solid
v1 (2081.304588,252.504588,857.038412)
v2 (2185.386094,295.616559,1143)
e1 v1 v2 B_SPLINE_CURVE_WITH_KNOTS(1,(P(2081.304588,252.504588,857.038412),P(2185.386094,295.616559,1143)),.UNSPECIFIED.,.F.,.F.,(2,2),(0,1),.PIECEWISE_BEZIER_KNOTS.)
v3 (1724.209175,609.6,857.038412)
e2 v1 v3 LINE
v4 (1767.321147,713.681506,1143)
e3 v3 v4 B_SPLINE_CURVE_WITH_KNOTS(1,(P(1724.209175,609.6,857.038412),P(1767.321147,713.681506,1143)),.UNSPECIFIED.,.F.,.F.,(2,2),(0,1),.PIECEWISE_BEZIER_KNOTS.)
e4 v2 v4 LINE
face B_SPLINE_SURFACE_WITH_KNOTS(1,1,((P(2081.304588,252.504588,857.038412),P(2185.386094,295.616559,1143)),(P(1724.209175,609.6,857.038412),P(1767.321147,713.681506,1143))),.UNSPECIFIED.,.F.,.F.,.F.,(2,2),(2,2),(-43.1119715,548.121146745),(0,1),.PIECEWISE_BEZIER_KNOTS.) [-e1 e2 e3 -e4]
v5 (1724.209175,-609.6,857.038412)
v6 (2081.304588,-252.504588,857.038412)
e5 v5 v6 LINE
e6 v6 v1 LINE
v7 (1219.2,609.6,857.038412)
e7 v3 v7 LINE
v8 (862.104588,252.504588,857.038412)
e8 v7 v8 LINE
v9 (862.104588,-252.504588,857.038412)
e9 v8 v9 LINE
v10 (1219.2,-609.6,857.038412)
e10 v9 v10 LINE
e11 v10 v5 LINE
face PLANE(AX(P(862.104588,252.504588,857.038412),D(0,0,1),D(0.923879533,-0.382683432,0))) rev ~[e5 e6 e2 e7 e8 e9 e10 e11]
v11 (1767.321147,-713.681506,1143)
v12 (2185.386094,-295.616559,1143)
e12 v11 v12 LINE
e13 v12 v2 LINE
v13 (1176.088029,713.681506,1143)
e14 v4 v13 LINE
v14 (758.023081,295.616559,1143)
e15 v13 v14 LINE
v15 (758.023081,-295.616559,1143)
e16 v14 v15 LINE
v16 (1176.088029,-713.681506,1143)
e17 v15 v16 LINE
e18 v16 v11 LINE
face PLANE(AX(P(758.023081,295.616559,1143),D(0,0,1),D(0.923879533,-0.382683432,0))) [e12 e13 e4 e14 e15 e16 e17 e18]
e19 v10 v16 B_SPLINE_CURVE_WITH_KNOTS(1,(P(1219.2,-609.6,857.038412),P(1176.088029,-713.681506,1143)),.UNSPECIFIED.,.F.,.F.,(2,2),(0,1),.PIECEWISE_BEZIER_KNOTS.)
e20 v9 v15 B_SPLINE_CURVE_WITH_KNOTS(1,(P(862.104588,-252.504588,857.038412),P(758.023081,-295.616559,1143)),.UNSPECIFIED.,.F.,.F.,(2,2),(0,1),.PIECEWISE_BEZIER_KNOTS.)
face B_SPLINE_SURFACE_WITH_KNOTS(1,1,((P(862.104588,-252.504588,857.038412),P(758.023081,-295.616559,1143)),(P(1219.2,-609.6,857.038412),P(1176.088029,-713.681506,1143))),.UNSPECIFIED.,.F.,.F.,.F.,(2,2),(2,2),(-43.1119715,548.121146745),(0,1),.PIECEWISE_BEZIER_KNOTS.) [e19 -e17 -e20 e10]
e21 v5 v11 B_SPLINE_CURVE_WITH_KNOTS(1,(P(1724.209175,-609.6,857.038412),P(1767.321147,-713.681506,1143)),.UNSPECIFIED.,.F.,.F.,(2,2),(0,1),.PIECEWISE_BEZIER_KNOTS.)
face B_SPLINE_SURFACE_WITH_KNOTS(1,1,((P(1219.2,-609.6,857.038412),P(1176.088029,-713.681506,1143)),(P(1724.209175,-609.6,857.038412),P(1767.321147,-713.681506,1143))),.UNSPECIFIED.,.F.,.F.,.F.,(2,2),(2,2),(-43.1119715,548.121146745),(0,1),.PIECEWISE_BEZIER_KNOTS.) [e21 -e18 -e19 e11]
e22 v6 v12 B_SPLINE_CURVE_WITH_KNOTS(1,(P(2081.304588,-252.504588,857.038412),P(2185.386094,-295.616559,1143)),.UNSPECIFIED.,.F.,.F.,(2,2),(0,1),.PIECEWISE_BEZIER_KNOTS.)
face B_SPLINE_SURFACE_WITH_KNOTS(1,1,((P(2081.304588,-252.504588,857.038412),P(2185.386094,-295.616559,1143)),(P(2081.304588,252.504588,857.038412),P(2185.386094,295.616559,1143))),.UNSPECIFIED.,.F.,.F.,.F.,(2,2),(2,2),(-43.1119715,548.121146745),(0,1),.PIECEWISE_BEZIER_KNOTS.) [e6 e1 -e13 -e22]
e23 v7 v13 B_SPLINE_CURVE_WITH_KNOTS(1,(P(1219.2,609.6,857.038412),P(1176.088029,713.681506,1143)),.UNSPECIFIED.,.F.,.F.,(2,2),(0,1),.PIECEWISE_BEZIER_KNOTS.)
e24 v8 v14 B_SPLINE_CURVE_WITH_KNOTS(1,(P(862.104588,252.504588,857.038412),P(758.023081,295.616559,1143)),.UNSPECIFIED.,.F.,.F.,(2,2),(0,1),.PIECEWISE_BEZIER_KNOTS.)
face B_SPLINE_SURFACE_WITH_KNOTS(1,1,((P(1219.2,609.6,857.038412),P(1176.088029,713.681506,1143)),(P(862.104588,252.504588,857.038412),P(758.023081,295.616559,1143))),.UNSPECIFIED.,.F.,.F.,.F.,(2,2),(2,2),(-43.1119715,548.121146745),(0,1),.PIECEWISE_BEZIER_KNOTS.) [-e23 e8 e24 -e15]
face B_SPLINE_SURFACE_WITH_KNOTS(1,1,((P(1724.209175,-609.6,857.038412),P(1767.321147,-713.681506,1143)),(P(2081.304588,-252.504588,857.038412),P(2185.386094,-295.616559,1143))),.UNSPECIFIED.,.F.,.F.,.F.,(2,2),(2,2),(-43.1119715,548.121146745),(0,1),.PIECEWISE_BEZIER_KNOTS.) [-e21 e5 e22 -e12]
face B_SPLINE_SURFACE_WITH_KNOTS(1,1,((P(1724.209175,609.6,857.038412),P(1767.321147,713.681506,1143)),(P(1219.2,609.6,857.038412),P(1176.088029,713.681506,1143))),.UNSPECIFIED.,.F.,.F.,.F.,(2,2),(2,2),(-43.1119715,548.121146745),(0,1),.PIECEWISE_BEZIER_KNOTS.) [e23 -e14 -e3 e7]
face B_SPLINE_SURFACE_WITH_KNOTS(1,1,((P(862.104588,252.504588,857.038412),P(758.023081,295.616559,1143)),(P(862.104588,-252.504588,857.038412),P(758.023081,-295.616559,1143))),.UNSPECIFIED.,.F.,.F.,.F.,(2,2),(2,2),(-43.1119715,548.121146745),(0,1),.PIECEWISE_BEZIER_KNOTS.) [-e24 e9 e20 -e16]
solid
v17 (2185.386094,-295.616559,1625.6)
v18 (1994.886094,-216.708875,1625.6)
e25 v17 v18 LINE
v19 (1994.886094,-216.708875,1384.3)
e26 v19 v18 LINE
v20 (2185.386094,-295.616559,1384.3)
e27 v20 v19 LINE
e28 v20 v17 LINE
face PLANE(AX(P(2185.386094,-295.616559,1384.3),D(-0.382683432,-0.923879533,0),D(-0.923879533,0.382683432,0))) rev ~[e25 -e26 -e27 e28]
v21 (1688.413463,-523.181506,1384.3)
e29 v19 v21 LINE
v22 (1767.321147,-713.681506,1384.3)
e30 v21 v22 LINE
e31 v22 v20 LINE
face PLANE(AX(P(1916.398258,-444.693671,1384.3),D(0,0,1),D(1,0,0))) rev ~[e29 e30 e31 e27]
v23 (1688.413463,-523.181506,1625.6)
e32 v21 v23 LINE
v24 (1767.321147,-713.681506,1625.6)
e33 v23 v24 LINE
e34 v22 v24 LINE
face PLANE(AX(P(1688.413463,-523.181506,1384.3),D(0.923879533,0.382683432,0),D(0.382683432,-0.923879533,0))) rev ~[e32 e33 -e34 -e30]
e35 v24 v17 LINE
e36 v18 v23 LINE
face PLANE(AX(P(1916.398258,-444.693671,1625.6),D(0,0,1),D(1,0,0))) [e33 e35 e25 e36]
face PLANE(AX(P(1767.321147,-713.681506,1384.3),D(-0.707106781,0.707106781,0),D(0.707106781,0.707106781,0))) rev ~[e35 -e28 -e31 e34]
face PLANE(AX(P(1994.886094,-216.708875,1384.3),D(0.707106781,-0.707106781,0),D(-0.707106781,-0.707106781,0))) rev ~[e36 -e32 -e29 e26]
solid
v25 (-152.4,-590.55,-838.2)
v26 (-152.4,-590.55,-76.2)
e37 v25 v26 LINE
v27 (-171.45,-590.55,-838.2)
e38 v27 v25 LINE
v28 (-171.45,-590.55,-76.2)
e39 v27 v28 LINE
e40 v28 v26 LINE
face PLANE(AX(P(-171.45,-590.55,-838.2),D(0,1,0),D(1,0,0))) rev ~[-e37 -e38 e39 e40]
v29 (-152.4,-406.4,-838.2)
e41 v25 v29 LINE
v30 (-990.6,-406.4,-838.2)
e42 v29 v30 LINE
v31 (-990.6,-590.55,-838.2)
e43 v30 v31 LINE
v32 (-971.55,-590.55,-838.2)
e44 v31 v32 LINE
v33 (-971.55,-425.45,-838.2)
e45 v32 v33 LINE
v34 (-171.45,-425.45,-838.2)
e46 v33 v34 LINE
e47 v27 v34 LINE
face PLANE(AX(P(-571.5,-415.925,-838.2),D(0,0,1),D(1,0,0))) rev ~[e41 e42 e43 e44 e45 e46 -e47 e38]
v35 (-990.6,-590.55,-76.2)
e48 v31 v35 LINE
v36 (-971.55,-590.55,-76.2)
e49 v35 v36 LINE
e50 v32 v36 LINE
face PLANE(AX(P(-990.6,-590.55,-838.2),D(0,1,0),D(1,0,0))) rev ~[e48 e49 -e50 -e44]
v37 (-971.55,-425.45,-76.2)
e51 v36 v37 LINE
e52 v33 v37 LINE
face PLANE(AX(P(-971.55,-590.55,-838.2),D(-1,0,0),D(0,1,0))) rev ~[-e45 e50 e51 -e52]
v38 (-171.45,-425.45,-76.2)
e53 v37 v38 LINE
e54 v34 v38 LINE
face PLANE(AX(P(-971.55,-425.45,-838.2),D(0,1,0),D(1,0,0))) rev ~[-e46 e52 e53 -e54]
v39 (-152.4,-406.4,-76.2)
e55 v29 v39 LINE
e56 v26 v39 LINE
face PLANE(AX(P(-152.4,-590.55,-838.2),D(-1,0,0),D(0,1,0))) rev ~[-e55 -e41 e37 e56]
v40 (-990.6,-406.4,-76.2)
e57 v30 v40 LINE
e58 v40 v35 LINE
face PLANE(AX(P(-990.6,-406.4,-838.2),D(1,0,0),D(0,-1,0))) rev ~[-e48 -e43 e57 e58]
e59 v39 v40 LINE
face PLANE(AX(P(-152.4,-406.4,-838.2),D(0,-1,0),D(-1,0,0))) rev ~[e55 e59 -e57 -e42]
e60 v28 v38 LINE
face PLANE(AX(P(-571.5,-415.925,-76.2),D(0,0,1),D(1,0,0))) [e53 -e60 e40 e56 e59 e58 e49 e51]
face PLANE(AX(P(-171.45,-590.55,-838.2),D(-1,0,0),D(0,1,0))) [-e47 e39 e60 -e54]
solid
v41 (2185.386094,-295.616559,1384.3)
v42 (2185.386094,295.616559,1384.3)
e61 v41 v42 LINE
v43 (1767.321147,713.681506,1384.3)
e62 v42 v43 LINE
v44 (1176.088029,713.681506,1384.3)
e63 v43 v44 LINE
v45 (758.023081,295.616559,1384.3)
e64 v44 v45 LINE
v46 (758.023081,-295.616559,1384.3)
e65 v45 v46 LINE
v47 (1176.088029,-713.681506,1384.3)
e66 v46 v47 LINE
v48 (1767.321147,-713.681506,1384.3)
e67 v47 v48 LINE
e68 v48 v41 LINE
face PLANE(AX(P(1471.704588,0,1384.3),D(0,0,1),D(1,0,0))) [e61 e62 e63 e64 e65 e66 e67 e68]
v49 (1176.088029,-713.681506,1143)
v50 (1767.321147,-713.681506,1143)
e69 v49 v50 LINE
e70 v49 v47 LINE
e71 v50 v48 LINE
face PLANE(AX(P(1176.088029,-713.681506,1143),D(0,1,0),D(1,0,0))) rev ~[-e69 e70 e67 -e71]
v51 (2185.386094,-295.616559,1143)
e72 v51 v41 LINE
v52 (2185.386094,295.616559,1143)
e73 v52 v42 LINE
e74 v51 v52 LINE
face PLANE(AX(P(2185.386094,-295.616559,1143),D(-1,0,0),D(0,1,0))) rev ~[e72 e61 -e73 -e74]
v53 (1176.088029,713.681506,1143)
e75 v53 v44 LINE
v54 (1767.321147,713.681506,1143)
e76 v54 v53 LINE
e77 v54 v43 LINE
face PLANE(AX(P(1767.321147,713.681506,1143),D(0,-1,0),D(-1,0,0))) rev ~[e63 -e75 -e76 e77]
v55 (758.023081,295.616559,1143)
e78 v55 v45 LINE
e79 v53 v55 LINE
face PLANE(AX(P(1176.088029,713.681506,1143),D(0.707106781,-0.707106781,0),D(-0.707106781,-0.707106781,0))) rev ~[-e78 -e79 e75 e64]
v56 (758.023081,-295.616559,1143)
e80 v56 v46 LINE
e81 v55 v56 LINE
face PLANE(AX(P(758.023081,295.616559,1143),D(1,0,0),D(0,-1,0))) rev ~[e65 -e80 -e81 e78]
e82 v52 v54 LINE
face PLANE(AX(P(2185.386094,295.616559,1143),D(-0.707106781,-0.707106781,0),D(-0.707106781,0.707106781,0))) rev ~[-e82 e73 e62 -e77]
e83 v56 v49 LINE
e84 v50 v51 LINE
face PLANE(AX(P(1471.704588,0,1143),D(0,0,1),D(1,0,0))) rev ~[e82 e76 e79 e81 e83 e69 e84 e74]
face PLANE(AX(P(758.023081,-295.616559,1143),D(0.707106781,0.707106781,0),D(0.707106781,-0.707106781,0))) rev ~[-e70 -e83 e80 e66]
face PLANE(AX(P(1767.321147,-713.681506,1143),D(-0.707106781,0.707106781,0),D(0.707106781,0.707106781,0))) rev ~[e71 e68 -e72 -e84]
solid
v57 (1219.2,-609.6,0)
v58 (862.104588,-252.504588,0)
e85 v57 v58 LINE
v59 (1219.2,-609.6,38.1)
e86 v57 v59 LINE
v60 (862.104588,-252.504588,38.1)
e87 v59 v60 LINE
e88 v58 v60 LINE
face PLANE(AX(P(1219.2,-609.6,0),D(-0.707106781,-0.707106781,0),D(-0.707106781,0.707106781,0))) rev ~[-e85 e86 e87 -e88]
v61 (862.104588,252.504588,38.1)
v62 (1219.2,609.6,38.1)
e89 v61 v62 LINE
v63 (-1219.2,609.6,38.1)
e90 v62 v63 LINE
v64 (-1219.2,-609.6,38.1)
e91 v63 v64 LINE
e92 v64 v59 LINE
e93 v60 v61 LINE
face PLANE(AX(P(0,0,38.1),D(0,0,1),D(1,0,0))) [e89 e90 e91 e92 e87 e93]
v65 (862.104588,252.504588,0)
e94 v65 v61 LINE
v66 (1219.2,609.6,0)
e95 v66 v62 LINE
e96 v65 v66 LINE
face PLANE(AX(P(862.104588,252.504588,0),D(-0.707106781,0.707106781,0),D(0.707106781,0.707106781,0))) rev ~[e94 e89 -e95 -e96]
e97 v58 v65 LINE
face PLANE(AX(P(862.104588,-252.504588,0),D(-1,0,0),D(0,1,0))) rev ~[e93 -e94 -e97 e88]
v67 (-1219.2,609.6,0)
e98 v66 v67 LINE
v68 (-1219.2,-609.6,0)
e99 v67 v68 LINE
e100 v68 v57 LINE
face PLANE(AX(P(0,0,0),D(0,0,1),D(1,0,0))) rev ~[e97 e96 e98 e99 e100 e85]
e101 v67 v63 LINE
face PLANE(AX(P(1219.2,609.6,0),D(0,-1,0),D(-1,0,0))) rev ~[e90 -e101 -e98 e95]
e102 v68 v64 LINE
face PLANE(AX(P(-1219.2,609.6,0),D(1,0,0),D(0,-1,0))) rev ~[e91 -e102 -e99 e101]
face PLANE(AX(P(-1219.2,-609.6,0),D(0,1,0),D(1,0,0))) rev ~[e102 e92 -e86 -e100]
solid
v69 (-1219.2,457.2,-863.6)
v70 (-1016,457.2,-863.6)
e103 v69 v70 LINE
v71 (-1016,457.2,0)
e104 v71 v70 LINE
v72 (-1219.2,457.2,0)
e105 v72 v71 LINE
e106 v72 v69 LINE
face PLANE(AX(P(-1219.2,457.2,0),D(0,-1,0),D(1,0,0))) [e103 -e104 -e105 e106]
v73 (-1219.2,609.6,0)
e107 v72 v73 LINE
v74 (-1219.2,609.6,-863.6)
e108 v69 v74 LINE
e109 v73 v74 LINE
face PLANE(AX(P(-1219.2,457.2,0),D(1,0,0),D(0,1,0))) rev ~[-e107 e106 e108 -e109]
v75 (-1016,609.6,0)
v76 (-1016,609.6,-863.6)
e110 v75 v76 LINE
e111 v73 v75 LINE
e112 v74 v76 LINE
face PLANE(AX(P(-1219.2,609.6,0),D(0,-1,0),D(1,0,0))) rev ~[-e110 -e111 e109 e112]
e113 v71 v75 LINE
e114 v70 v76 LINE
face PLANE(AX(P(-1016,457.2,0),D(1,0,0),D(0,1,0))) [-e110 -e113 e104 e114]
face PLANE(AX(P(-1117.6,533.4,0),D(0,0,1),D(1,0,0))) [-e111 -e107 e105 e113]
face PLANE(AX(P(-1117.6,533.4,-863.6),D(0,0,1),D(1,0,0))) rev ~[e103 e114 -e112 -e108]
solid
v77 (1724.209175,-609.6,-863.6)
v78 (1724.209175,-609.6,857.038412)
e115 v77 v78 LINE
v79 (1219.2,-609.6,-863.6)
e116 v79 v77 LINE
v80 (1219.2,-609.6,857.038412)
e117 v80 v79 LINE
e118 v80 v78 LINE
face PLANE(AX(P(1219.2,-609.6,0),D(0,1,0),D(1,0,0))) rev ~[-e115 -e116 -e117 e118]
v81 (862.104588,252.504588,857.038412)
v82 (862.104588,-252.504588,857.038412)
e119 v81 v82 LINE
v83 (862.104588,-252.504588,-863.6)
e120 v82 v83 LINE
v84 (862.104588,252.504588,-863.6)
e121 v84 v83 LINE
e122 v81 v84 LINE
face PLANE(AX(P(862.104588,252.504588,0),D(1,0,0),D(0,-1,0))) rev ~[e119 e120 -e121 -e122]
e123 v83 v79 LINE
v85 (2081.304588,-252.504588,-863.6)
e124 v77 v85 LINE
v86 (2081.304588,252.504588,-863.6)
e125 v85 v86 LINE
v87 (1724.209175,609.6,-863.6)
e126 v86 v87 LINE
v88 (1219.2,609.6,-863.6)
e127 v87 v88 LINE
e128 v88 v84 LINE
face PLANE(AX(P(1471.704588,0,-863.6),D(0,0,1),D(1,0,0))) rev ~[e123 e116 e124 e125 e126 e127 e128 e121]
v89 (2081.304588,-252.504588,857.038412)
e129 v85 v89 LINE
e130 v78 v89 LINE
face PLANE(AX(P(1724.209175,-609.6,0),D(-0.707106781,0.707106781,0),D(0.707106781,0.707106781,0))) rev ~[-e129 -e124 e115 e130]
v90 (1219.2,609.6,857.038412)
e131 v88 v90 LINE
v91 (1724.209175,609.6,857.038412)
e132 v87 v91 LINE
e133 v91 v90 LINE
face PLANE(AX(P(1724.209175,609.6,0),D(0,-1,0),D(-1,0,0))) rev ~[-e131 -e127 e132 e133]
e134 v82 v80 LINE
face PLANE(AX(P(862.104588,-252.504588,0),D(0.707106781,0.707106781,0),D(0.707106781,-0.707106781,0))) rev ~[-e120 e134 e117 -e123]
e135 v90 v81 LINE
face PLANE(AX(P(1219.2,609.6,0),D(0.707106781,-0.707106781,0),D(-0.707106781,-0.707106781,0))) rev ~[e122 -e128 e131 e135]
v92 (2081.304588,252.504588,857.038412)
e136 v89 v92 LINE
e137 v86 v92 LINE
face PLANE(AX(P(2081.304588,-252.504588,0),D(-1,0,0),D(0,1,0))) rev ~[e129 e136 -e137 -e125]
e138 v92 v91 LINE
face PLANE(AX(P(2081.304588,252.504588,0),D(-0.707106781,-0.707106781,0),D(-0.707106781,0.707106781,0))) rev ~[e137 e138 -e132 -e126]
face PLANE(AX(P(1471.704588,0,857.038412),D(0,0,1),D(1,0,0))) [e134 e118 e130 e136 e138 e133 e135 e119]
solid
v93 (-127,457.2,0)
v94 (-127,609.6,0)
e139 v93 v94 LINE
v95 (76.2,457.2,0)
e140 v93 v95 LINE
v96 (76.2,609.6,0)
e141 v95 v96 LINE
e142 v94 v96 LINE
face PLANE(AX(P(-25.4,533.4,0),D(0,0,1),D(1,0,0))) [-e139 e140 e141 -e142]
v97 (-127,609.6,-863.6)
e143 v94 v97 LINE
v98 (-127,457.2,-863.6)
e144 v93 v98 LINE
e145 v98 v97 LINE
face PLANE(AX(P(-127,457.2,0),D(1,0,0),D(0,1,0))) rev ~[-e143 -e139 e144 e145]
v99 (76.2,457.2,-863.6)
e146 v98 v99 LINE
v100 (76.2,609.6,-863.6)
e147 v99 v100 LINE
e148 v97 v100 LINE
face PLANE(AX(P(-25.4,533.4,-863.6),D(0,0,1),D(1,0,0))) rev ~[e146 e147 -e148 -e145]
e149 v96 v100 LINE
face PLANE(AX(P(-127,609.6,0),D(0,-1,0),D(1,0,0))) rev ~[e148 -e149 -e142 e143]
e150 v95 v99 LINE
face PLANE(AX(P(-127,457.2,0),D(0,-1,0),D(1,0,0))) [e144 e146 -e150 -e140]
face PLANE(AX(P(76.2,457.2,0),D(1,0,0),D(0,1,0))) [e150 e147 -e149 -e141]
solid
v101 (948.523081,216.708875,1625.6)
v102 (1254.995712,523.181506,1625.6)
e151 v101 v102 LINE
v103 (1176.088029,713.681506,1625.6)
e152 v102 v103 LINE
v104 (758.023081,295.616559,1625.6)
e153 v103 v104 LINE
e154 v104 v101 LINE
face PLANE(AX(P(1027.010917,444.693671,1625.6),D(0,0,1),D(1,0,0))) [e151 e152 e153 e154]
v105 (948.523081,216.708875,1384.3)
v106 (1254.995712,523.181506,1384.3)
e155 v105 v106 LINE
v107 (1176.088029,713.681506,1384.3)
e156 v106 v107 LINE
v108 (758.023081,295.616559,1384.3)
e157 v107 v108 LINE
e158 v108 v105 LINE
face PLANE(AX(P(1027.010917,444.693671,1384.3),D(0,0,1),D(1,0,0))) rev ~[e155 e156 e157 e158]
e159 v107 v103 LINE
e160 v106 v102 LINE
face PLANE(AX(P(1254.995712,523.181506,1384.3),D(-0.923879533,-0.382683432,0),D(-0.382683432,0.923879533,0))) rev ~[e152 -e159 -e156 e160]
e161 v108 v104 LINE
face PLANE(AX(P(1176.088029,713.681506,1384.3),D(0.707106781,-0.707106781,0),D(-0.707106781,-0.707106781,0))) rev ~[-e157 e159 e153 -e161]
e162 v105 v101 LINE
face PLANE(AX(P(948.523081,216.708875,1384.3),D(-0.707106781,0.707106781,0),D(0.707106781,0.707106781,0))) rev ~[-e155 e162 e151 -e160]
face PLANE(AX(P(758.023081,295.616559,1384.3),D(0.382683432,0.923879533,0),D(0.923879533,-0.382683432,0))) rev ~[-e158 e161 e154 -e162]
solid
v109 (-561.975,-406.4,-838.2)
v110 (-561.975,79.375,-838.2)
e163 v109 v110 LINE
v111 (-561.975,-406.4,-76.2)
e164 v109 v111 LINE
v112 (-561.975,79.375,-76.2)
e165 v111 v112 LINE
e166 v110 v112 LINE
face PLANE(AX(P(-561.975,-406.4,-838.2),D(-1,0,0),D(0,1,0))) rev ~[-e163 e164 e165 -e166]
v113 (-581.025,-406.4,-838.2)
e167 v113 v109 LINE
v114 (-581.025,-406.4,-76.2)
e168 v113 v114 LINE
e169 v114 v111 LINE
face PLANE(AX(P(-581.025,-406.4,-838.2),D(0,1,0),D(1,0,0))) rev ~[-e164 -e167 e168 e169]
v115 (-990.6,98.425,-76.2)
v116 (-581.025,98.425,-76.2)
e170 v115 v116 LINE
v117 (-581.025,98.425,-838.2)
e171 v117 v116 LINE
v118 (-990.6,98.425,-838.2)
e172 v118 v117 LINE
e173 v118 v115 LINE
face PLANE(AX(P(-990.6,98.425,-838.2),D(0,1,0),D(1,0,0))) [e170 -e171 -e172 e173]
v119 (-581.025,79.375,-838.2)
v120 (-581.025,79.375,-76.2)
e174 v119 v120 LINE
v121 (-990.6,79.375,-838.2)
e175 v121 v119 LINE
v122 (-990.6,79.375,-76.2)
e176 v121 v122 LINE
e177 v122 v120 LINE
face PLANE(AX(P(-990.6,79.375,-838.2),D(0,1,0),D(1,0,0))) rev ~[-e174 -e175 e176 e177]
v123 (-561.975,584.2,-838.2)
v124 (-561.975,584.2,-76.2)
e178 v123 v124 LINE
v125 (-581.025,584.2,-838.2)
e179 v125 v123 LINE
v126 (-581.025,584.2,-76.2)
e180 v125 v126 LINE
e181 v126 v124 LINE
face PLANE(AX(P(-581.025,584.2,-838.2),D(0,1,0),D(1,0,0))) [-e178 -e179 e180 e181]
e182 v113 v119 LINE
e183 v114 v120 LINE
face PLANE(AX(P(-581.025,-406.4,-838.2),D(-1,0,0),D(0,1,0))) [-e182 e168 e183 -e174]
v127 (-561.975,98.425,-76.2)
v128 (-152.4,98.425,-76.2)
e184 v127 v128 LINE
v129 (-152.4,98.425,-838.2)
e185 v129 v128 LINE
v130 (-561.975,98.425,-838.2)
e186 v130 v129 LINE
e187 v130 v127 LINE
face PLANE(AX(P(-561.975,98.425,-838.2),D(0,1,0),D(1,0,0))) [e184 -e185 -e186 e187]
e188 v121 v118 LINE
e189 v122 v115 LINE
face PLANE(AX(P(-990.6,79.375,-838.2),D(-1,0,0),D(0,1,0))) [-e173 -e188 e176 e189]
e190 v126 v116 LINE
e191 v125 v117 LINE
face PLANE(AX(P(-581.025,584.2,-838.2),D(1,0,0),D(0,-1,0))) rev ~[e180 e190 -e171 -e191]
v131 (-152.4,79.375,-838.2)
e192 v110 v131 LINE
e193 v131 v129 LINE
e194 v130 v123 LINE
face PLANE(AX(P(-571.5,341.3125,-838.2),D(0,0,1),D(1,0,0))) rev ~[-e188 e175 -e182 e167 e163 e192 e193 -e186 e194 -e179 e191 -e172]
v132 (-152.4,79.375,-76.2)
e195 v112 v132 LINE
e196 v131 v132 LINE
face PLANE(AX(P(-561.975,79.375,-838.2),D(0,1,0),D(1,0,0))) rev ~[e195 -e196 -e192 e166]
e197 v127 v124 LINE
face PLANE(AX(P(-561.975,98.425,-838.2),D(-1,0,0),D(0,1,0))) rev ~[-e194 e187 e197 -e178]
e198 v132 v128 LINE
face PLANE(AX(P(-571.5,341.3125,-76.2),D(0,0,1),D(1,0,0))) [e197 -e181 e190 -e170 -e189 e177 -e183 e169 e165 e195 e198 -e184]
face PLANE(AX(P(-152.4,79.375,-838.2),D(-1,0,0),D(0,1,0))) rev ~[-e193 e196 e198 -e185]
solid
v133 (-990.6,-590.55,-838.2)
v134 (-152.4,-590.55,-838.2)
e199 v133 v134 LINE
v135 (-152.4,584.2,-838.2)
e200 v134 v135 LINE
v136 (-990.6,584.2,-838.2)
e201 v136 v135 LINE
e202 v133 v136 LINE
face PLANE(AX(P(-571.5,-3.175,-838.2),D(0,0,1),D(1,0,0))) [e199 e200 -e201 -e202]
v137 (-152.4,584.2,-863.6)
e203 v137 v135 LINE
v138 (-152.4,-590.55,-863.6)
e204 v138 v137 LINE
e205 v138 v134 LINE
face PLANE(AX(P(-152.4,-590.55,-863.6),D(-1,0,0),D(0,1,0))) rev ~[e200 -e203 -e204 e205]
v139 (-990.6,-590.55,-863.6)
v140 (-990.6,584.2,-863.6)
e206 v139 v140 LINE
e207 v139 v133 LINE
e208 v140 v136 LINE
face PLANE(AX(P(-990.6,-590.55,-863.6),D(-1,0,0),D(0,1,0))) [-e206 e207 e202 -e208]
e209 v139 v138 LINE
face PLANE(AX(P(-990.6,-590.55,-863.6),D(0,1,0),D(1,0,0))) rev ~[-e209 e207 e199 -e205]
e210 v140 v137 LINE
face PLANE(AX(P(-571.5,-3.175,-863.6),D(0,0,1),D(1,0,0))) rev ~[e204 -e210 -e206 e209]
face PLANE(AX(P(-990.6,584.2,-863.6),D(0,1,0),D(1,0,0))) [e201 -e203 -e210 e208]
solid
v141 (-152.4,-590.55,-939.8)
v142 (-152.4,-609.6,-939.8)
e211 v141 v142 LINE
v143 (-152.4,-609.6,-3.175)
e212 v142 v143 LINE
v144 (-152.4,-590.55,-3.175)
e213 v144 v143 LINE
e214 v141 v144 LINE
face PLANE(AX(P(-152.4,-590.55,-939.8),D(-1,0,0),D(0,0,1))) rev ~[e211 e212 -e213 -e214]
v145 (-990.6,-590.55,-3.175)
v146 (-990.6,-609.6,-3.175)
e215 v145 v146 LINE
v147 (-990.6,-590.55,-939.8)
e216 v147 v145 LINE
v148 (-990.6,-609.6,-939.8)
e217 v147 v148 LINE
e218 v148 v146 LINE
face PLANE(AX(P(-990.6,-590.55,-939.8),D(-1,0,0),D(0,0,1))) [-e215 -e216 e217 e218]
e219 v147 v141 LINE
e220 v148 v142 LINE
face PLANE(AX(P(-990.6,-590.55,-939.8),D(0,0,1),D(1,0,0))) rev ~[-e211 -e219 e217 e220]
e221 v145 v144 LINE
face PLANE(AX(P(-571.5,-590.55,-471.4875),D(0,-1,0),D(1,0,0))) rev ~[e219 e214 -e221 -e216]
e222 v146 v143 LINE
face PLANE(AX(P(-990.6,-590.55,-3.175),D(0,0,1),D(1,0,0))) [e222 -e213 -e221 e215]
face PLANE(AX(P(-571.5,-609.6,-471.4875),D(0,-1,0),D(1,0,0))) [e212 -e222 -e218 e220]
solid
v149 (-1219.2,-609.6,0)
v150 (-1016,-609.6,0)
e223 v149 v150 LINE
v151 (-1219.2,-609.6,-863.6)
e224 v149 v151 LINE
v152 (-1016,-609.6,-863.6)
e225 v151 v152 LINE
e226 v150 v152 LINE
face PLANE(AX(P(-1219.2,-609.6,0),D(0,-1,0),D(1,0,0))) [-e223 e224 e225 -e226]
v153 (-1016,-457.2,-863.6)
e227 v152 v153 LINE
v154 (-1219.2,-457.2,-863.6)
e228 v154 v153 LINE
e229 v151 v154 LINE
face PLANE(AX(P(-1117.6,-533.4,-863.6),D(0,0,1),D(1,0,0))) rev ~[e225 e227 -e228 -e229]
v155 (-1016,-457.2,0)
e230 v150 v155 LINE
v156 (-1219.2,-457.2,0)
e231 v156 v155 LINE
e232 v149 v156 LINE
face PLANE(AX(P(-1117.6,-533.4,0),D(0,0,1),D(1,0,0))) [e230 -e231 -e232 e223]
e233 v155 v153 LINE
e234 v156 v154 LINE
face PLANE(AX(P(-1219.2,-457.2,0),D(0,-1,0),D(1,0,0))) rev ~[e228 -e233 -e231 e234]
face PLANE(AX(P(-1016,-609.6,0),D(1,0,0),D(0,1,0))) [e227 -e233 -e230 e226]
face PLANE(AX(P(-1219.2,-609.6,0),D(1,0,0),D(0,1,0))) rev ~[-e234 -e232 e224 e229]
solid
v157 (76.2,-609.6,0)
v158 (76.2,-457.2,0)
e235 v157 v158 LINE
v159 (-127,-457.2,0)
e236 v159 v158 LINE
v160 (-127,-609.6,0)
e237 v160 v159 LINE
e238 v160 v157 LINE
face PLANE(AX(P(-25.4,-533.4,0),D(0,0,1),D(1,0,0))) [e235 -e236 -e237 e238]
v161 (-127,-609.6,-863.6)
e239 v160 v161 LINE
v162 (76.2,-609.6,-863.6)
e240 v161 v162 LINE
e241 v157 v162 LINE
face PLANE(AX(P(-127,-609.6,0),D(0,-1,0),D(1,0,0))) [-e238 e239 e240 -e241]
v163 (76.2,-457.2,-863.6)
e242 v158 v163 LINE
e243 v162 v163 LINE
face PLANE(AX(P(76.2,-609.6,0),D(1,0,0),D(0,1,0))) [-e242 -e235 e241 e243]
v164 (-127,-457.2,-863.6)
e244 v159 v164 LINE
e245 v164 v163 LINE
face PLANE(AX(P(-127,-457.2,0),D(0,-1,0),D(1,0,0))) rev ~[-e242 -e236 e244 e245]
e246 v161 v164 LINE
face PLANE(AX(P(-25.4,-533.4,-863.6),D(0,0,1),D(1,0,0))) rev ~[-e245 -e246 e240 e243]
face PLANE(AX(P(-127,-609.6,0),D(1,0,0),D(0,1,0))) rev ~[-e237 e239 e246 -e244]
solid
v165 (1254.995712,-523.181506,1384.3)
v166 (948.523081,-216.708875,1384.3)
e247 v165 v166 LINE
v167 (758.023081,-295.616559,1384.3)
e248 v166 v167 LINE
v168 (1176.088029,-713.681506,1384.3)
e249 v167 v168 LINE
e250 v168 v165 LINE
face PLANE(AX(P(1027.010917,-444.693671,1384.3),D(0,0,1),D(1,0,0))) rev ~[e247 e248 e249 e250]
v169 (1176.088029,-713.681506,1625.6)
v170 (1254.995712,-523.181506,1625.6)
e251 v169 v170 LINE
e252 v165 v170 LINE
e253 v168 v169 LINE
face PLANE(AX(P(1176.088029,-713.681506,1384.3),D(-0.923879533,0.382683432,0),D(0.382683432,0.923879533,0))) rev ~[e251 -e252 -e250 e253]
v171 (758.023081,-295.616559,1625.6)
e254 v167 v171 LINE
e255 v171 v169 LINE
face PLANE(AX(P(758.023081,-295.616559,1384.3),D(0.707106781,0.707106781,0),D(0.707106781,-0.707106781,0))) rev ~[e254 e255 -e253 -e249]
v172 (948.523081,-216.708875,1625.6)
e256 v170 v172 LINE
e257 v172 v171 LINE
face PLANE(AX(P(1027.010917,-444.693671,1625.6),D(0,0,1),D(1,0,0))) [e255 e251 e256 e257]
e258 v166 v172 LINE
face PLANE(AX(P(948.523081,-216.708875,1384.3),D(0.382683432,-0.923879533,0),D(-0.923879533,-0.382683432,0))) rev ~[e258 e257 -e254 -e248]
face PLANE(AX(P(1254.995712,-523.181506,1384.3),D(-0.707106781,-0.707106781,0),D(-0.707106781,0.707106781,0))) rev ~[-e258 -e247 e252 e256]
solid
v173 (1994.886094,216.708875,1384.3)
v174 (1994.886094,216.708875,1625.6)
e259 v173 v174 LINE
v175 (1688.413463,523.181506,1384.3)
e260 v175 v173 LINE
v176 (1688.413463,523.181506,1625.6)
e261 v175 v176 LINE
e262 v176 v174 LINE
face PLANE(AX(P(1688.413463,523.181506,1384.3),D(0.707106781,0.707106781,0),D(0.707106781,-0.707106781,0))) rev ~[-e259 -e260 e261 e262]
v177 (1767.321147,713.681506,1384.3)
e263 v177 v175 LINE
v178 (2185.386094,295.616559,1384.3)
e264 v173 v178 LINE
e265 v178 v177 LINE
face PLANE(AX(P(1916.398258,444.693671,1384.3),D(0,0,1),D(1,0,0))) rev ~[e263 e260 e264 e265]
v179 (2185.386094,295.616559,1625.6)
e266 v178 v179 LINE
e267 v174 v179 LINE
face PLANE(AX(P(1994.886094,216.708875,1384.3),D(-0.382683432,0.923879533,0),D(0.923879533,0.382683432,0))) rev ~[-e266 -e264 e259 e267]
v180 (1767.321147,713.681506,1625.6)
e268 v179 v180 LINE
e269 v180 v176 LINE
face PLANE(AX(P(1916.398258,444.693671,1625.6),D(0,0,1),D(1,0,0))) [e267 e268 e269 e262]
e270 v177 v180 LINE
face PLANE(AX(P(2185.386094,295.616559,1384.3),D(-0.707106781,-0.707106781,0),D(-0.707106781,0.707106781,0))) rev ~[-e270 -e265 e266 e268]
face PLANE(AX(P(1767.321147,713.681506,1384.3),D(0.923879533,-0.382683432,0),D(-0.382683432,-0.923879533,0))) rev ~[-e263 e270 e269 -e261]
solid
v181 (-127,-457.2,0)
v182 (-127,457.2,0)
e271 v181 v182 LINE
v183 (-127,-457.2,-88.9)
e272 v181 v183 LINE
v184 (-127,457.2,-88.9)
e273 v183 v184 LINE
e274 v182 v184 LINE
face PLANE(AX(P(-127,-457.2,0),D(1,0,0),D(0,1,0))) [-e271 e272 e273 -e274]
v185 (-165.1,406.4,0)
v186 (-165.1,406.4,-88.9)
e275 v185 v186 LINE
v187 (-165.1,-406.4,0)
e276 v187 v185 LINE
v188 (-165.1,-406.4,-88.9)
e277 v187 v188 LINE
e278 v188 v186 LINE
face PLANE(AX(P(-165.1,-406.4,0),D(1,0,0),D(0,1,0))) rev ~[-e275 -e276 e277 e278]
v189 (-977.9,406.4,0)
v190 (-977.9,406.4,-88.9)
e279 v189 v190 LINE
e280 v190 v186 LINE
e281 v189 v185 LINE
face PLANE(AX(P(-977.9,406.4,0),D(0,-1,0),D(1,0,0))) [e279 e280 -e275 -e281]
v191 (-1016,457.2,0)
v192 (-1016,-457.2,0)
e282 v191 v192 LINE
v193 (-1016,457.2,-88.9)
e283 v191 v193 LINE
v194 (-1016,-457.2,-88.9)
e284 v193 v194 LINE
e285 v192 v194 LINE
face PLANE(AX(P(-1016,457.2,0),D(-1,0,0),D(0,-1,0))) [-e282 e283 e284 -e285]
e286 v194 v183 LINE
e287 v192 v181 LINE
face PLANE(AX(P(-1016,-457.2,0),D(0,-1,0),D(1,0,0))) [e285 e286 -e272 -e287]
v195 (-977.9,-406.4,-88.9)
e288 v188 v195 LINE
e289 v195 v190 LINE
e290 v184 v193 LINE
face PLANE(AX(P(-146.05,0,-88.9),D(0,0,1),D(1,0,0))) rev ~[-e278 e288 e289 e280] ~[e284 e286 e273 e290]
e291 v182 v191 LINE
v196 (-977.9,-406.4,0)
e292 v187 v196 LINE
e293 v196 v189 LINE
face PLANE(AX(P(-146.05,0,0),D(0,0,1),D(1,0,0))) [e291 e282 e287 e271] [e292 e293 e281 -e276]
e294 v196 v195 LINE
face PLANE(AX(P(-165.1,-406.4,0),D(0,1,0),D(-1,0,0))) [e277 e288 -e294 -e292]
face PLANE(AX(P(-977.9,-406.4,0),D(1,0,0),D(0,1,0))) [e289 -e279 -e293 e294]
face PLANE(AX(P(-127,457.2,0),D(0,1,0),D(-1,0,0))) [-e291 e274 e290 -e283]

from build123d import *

# Parameters (mm, degrees)
F3_DEPTH      = 38.1
F4_W          = 203.2
F4_H          = 152.4
F5_DEPTH      = 863.6
F8_DEPTH      = 863.6
F8_DEPTH_BACK = 857.0384116704
F10_DEPTH     = 285.9615883296
F10_TAPER     = -20
F12_DEPTH     = 241.3
F14_DEPTH     = 241.3
F15_W         = 38.1
F15_H         = 812.8
F16_DEPTH     = 88.9
F18_W         = 838.2
F18_H         = 1174.75
F19_DEPTH     = 25.4
F21_W         = 838.2
F21_H         = 936.625
F22_DEPTH     = 19.05
F23_W         = 19.05
F23_H         = 165.1
F24_DEPTH     = 762
F25_W         = 19.05
F25_H         = 485.775
F25_H_2       = 19.05
F25_W_2       = 409.575
F26_DEPTH     = 762


with BuildPart() as f3:
    # F2 (on Top) → F3 (new body)
    with BuildSketch(Plane.XY):
        Polygon((-1219.2, 609.6), (-1219.2, -609.6), (1219.2, -609.6), (862.1045876226, -252.5045876226), (862.1045876226, 252.5045876226), (1219.2, 609.6), align=None)
    extrude(amount=F3_DEPTH)


with BuildPart() as f5:
    # F4 (on Top) → F5 (new body, through all)
    with BuildSketch(Plane.XY):
        with Locations((-1117.6, 533.4)):
            Rectangle(F4_W, F4_H)
    extrude(amount=-F5_DEPTH)


with BuildPart() as f5b:
    # F4 (on Top) → F5, piece 2 (new body, through all)
    with BuildSketch(Plane.XY):
        with Locations((-1117.6, -533.4)):
            Rectangle(F4_W, F4_H)
    extrude(amount=-F5_DEPTH)


with BuildPart() as f5c:
    # F4 (on Top) → F5, piece 3 (new body, through all)
    with BuildSketch(Plane.XY):
        with Locations((-25.4, 533.4)):
            Rectangle(F4_W, F4_H)
    extrude(amount=-F5_DEPTH)


with BuildPart() as f5d:
    # F4 (on Top) → F5, piece 4 (new body, through all)
    with BuildSketch(Plane.XY):
        with Locations((-25.4, -533.4)):
            Rectangle(F4_W, F4_H)
    extrude(amount=-F5_DEPTH)


with BuildPart() as f8:
    # F7 (on Top) → F8 (new body, two sides)
    with BuildSketch(Plane.XY) as f8_sk:
        Polygon((1219.2, -609.6), (1724.2091752453, -609.6), (2081.3045876226, -252.5045876226), (2081.3045876226, 252.5045876226), (1724.2091752453, 609.6), (1219.2, 609.6), (862.1045876226, 252.5045876226), (862.1045876226, -252.5045876226), align=None)
    extrude(amount=-F8_DEPTH)
    extrude(f8_sk.sketch, amount=F8_DEPTH_BACK)


with BuildPart() as f10:
    # F9 (on face) → F10 (new body, through all)
    with BuildSketch(Plane.XY.offset(857.0384116704)):
        Polygon((862.1045876226, 252.5045876226), (862.1045876226, -252.5045876226), (1219.2, -609.6), (1724.2091752453, -609.6), (2081.3045876226, -252.5045876226), (2081.3045876226, 252.5045876226), (1724.2091752453, 609.6), (1219.2, 609.6), align=None)
    extrude(amount=F10_DEPTH, taper=F10_TAPER)


with BuildPart() as f12:
    # F11 (on face) → F12 (new body, through all)
    with BuildSketch(Plane.XY.offset(1143)):
        Polygon((1767.3211467451, 713.6815062955), (1176.0880285002, 713.6815062955), (758.0230813272, 295.6165591224), (758.0230813272, -295.6165591224), (1176.0880285002, -713.6815062955), (1767.3211467451, -713.6815062955), (2185.3860939181, -295.6165591224), (2185.3860939181, 295.6165591224), align=None)
    extrude(amount=F12_DEPTH)


with BuildPart() as f14:
    # F13 (on face) → F14 (new body, through all)
    with BuildSketch(Plane.XY.offset(1384.3)):
        Polygon((1254.9957121323, 523.1815062955), (1176.0880285002, 713.6815062955), (758.0230813272, 295.6165591224), (948.5230813272, 216.7088754904), align=None)
    extrude(amount=F14_DEPTH)


with BuildPart() as f14b:
    # F13 (on face) → F14, piece 2 (new body, through all)
    with BuildSketch(Plane.XY.offset(1384.3)):
        Polygon((2185.3860939181, 295.6165591224), (1767.3211467451, 713.6815062955), (1688.413463113, 523.1815062955), (1994.8860939181, 216.7088754904), align=None)
    extrude(amount=F14_DEPTH)


with BuildPart() as f14c:
    # F13 (on face) → F14, piece 3 (new body, through all)
    with BuildSketch(Plane.XY.offset(1384.3)):
        Polygon((1767.3211467451, -713.6815062955), (2185.3860939181, -295.6165591224), (1994.8860939181, -216.7088754904), (1688.413463113, -523.1815062955), align=None)
    extrude(amount=F14_DEPTH)


with BuildPart() as f14d:
    # F13 (on face) → F14, piece 4 (new body, through all)
    with BuildSketch(Plane.XY.offset(1384.3)):
        Polygon((948.5230813272, -216.7088754904), (758.0230813272, -295.6165591224), (1176.0880285002, -713.6815062955), (1254.9957121323, -523.1815062955), align=None)
    extrude(amount=F14_DEPTH)


with BuildPart() as f16:
    # F15 (on Top) → F16 (new body)
    with BuildSketch(Plane.XY):
        with Locations((-146.05, 0)):
            Rectangle(F15_W, F15_H)
        Polygon((-977.9, -406.4), (-1016, -406.4), (-1016, -457.2), (-127, -457.2), (-127, -406.4), (-165.1, -406.4), align=None)
        with Locations((-996.95, 0)):
            Rectangle(F15_W, F15_H)
        Polygon((-127, 457.2), (-1016, 457.2), (-1016, 406.4), (-977.9, 406.4), (-165.1, 406.4), (-127, 406.4), align=None)
    extrude(amount=-F16_DEPTH)


with BuildPart() as f19:
    # F18 (on plane+point) → F19 (new body)
    with BuildSketch(Plane.XY.offset(-863.6)):
        with Locations((-571.5, -3.175)):
            Rectangle(F18_W, F18_H)
    extrude(amount=F19_DEPTH)


with BuildPart() as f22:
    # F21 (on plane+point) → F22 (new body, through all)
    with BuildSketch(Plane.XZ.offset(590.55)):
        with Locations((-571.5, -471.4875)):
            Rectangle(F21_W, F21_H)
    extrude(amount=F22_DEPTH)


with BuildPart() as f24:
    # F23 (on face) → F24 (new body)
    with BuildSketch(Plane.XY.offset(-838.2)):
        Polygon((-152.4, -406.4), (-990.6, -406.4), (-990.6, -425.45), (-971.55, -425.45), (-171.45, -425.45), (-152.4, -425.45), align=None)
        with Locations((-981.075, -508)):
            Rectangle(F23_W, F23_H)
        with Locations((-161.925, -508)):
            Rectangle(F23_W, F23_H)
    extrude(amount=F24_DEPTH)


with BuildPart() as f26:
    # F25 (on face) → F26 (new body)
    with BuildSketch(Plane.XY.offset(-838.2)):
        with Locations((-571.5, 341.3125)):
            Rectangle(F25_W, F25_H)
        with Locations((-571.5, 88.9)):
            Rectangle(F25_W, F25_H_2)
        with Locations((-785.8125, 88.9)):
            Rectangle(F25_W_2, F25_H_2)
        with Locations((-357.1875, 88.9)):
            Rectangle(F25_W_2, F25_H_2)
        with Locations((-571.5, -163.5125)):
            Rectangle(F25_W, F25_H)
    extrude(amount=F26_DEPTH)


solid = Compound([f3.part, f5.part, f5b.part, f5c.part, f5d.part, f8.part, f10.part, f12.part, f14.part, f14b.part, f14c.part, f14d.part, f16.part, f19.part, f22.part, f24.part, f26.part])
